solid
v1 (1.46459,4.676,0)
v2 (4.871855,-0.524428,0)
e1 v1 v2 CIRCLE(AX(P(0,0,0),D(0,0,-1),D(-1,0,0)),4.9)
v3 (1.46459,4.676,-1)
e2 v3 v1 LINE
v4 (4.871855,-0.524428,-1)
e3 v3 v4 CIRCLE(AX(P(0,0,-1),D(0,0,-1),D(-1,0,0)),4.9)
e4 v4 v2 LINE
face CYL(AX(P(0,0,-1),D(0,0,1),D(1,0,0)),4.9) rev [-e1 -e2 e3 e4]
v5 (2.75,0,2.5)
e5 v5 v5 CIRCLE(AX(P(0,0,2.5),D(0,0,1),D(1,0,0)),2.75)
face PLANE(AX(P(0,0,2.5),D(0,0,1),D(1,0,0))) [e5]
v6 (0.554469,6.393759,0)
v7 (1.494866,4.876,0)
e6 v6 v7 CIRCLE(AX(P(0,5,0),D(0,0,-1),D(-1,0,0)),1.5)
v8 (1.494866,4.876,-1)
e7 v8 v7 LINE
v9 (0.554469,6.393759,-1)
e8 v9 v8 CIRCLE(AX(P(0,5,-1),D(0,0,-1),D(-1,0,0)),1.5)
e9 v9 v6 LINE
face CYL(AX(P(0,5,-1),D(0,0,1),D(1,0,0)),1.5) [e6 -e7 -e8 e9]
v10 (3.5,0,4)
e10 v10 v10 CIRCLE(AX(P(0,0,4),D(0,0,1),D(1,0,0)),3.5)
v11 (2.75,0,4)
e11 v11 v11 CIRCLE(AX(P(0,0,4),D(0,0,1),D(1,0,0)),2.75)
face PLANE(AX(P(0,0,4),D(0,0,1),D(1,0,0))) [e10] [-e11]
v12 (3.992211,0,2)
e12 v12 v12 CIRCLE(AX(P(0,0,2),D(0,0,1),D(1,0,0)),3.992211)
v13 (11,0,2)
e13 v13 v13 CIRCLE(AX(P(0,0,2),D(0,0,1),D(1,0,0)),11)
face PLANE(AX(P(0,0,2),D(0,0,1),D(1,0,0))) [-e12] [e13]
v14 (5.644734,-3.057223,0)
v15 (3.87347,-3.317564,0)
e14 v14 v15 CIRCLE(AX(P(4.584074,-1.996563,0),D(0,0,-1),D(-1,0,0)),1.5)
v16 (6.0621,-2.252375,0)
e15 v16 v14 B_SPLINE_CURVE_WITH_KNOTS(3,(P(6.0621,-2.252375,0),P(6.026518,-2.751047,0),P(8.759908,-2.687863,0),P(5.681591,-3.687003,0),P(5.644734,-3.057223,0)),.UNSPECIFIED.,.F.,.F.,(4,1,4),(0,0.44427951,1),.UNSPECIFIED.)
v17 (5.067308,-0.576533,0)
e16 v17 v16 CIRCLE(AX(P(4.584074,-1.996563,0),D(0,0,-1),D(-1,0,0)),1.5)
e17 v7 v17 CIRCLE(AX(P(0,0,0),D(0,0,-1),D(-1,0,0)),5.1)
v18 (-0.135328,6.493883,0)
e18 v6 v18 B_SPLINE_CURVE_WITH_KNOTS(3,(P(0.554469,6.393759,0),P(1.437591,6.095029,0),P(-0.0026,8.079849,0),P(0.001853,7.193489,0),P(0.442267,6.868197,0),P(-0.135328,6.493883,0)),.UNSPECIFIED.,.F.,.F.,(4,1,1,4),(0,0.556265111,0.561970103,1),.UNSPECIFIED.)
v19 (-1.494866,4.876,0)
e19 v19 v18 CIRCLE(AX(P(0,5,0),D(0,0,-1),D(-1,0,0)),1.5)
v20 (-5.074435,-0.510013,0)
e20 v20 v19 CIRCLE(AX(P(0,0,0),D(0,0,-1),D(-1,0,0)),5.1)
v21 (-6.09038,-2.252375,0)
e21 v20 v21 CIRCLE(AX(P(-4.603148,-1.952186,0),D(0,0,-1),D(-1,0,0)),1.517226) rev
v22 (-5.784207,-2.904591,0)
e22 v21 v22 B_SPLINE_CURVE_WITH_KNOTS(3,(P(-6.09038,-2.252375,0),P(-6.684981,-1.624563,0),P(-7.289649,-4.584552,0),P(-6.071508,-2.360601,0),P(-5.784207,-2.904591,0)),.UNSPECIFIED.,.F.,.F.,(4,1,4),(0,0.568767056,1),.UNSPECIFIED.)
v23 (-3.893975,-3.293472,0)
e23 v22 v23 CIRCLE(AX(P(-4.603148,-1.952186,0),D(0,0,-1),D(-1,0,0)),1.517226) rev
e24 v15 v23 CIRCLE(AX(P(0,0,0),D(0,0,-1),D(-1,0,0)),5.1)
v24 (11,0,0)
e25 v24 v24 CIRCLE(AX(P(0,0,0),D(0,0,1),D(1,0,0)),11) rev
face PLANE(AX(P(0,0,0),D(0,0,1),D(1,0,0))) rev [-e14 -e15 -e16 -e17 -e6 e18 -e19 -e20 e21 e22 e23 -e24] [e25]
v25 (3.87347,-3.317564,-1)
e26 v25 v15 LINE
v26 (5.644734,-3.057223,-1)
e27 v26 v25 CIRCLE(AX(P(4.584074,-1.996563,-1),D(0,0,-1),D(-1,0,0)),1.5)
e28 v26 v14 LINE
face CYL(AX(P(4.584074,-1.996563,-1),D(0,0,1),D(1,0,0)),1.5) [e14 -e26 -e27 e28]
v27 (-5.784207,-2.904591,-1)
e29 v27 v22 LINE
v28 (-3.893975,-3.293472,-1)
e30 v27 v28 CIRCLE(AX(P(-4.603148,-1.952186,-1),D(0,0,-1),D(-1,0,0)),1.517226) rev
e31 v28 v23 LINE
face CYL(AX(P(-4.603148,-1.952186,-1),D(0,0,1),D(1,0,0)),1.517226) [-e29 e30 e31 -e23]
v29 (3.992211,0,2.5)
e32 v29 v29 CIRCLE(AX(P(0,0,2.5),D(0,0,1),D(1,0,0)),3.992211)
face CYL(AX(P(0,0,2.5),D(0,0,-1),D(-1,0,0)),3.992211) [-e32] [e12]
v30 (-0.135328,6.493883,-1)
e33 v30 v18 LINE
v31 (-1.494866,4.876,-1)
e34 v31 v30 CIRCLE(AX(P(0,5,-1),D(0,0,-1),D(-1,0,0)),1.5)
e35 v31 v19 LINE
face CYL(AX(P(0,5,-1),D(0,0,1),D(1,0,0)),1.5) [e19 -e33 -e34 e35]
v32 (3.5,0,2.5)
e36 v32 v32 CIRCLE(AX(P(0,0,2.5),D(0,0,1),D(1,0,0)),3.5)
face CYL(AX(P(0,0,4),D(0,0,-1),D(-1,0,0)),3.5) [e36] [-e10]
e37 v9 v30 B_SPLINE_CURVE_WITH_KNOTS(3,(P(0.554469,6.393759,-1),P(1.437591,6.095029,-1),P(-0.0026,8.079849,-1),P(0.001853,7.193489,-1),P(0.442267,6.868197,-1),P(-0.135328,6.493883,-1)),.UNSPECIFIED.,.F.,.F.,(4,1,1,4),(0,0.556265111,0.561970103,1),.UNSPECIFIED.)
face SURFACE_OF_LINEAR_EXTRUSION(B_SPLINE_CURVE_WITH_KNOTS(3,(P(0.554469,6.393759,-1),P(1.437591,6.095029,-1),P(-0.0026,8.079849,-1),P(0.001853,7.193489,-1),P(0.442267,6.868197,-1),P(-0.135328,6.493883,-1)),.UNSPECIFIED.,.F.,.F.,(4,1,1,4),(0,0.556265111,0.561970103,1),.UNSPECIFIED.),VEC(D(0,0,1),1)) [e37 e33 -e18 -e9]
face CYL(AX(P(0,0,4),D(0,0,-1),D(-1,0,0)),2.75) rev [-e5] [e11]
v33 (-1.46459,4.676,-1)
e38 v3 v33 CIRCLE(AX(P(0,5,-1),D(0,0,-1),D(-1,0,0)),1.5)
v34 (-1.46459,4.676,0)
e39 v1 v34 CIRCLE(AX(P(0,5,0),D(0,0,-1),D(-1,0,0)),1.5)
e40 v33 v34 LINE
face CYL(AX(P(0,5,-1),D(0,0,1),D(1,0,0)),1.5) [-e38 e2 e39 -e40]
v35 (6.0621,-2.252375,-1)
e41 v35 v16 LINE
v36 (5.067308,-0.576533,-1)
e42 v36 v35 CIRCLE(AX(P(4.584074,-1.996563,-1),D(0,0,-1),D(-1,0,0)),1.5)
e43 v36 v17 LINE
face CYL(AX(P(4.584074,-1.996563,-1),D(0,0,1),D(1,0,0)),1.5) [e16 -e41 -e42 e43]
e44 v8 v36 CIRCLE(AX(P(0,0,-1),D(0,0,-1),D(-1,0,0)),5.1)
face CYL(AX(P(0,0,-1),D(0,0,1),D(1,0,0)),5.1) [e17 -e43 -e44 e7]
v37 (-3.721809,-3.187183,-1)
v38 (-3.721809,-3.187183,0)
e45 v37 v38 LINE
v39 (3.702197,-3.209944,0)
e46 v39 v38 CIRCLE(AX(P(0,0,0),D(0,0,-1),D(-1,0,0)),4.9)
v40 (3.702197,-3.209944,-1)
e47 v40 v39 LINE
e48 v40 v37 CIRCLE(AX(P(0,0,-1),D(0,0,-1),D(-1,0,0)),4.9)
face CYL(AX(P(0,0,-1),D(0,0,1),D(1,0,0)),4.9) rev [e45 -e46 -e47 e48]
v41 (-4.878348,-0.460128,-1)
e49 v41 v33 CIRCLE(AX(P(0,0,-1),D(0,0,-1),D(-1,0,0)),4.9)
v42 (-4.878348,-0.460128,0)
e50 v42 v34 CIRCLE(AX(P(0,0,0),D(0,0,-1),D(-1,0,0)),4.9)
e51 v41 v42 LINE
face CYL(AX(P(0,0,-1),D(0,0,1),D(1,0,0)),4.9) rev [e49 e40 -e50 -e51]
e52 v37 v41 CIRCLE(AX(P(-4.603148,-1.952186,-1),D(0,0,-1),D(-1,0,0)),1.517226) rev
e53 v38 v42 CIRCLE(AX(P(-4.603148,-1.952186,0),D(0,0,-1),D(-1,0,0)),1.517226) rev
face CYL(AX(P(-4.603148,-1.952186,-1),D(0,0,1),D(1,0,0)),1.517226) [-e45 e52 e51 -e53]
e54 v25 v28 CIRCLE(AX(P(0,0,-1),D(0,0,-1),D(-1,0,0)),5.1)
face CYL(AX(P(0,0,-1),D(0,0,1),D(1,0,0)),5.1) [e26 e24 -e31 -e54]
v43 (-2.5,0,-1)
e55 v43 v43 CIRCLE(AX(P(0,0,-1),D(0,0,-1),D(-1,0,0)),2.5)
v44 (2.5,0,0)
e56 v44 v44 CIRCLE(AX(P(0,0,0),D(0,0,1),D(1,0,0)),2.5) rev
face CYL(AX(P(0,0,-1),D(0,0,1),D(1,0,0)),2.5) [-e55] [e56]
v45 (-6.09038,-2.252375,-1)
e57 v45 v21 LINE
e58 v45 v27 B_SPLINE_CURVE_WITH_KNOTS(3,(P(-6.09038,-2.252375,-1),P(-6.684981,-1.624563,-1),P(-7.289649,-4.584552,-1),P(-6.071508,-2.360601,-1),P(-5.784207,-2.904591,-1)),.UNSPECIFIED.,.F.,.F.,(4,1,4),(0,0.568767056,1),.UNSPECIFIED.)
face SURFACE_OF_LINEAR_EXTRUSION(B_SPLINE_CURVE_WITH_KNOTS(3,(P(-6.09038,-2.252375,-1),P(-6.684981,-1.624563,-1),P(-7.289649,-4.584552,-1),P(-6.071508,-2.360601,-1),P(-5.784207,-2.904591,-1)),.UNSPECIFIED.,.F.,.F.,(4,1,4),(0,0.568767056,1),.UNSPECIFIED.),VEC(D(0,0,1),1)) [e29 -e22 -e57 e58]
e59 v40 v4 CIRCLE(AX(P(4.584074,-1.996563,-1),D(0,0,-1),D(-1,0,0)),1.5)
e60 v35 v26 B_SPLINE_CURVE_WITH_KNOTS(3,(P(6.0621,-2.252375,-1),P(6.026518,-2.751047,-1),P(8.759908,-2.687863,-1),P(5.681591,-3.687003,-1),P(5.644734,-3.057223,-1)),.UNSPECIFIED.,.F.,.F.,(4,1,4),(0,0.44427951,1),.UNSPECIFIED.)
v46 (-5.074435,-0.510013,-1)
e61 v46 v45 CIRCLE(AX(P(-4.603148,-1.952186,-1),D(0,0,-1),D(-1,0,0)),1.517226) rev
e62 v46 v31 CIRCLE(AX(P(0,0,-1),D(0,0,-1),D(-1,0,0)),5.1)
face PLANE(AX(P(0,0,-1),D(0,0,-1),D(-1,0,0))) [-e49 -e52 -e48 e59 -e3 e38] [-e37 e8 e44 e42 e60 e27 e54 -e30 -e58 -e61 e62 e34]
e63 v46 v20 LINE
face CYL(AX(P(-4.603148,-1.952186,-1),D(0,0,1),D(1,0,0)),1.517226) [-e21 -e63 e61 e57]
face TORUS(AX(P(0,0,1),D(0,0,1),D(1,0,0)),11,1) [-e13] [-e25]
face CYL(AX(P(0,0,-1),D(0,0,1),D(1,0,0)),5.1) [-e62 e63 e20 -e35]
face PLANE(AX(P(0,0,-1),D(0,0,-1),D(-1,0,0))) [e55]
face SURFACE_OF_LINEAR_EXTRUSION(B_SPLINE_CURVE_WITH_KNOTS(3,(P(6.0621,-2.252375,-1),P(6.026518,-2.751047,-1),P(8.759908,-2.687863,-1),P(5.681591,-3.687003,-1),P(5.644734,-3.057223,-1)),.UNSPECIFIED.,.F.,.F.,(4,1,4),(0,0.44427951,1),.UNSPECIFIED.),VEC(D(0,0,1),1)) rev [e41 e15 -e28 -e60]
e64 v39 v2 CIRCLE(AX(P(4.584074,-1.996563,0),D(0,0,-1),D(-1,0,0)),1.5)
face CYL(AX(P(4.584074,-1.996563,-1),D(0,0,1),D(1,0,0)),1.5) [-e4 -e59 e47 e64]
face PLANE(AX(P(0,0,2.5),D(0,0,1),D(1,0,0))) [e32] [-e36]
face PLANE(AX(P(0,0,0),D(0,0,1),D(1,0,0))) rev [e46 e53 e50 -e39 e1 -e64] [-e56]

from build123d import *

# Parameters (mm, degrees)
SKETCH1_R           = 12
BOSS_EXTRUDE1_DEPTH = 2
SKETCH2_R           = 3.5
SKETCH2_R_2         = 2.75
BOSS_EXTRUDE2_DEPTH = 2
FILLET1_R           = 1
SKETCH3_R           = 2.5
BOSS_EXTRUDE3_DEPTH = 1
SKETCH4_R           = 3.992210858
BOSS_EXTRUDE4_DEPTH = 0.5


with BuildPart() as part:
    # Sketch1 → Boss-Extrude1 (new body)
    with BuildSketch(Plane.XY):
        Circle(SKETCH1_R)
    extrude(amount=BOSS_EXTRUDE1_DEPTH)

    # Sketch2 → Boss-Extrude2 (add)
    with BuildSketch(Plane.XY.offset(2)):
        Circle(SKETCH2_R)
        Circle(SKETCH2_R_2, mode=Mode.SUBTRACT)
    extrude(amount=BOSS_EXTRUDE2_DEPTH)

    # Fillet1
    fillet1_edges = [part.edges().sort_by_distance(p)[0] for p in [
        (-12, 0, 0),
        (-12, 0, 2),
    ]]
    fillet(fillet1_edges, radius=FILLET1_R - 0.0001)  # a hair under: the kernel refuses the full size

    # Sketch3 → Boss-Extrude3 (add)
    with BuildSketch(Plane(origin=(0, 0, 0), x_dir=(-1, 0, 0), z_dir=(0, 0, -1))):
        with Locations(Location((0, 0, 0), (0, 0, 180))):
            Circle(SKETCH3_R)
        with BuildLine():
            ThreePointArc((-5.067307925, -0.57653308), (-5.873937117, -1.230891086), (-6.062099925, -2.252375207))
            ThreePointArc((-6.062099925, -2.252375207), (-5.915680958, -2.687087026), (-5.644734338, -3.057223228))
            ThreePointArc((-5.644734338, -3.057223228), (-4.802200561, -3.480618607), (-3.873470329, -3.317563506))
            ThreePointArc((-3.873470329, -3.317563506), (-4.675755649, -2.036494318), (-5.067307925, -0.57653308))
        make_face()
        with BuildLine():
            ThreePointArc((-5.644734338, -3.057223228), (-5.915680958, -2.687087026), (-6.062099925, -2.252375207))
            add(Edge.make_bspline(
                [(-6.062099925, -2.252375207), (-6.026517589, -2.751047072), (-8.759907871, -2.687863498), (-5.681591245, -3.687002551), (-5.644734338, -3.057223228)],
                knots=[0, 0, 0, 0, 0.44427951, 1, 1, 1, 1], degree=3))
        make_face()
        with BuildLine():
            ThreePointArc((-1.49486588, 4.876), (-4.265918484, 2.794984703), (-5.067307925, -0.57653308))
            ThreePointArc((-5.067307925, -0.57653308), (-4.970460995, -0.547182079), (-4.871855436, -0.524427893))
            ThreePointArc((-4.871855436, -0.524427893), (-4.098627563, 2.68537746), (-1.464590045, 4.676))
            ThreePointArc((-1.464590045, 4.676), (-1.483103113, 4.775489073), (-1.49486588, 4.876))
        make_face()
        with BuildLine():
            ThreePointArc((-4.871855436, -0.524427893), (-4.970460995, -0.547182079), (-5.067307925, -0.57653308))
            ThreePointArc((-5.067307925, -0.57653308), (-4.675755649, -2.036494318), (-3.873470329, -3.317563506))
            ThreePointArc((-3.873470329, -3.317563506), (-3.786017441, -3.266643945), (-3.702196885, -3.209943649))
            ThreePointArc((-3.702196885, -3.209943649), (-4.492392683, -1.956631796), (-4.871855436, -0.524427893))
        make_face()
        with BuildLine():
            ThreePointArc((-3.702196885, -3.209943649), (-3.786017441, -3.266643945), (-3.873470329, -3.317563506))
            ThreePointArc((-3.873470329, -3.317563506), (0.01581793, -5.09997547), (3.893974917, -3.293472232))
            ThreePointArc((3.893974917, -3.293472232), (3.806118362, -3.243200717), (3.721809355, -3.187182945))
            ThreePointArc((3.721809355, -3.187182945), (0.015022472, -4.899976972), (-3.702196885, -3.209943649))
        make_face()
        with BuildLine():
            ThreePointArc((-3.084074166, -1.996563057), (-3.630573223, -0.838618346), (-4.871855436, -0.524427893))
            ThreePointArc((-4.871855436, -0.524427893), (-4.492392683, -1.956631796), (-3.702196885, -3.209943649))
            ThreePointArc((-3.702196885, -3.209943649), (-3.247508432, -2.677438992), (-3.084074166, -1.996563057))
        make_face()
        with BuildLine():
            ThreePointArc((1.49486588, 4.876), (0, 5.1), (-1.49486588, 4.876))
            ThreePointArc((-1.49486588, 4.876), (-1.483103113, 4.775489073), (-1.464590045, 4.676))
            ThreePointArc((-1.464590045, 4.676), (0, 4.9), (1.464590045, 4.676))
            ThreePointArc((1.464590045, 4.676), (1.483103113, 4.775489073), (1.49486588, 4.876))
        make_face()
        with BuildLine():
            ThreePointArc((-0.554469126, 6.393758942), (-1.275084916, 5.790036997), (-1.49486588, 4.876))
            ThreePointArc((-1.49486588, 4.876), (0, 5.1), (1.49486588, 4.876))
            ThreePointArc((1.49486588, 4.876), (1.49871592, 4.937946879), (1.5, 5))
            ThreePointArc((1.5, 5), (1.10747264, 6.011683919), (0.135327531, 6.493883014))
            ThreePointArc((0.135327531, 6.493883014), (-0.215467229, 6.484443961), (-0.554469126, 6.393758942))
        make_face()
        with BuildLine():
            ThreePointArc((5.074434577, -0.510013455), (4.695210635, -1.991230046), (3.893974917, -3.293472232))
            ThreePointArc((3.893974917, -3.293472232), (4.908886749, -3.438287773), (5.784206585, -2.904590527))
            add(Edge.make_bspline(
                [(5.865406446, -2.794015708), (5.836751545, -2.820305024), (5.809552866, -2.856598637), (5.784206585, -2.904590527)],
                knots=[0.961955758, 0.961955758, 0.961955758, 0.961955758, 1, 1, 1, 1], degree=3))
            ThreePointArc((5.865406446, -2.794015708), (6.004314758, -2.534169766), (6.090380192, -2.252375207))
            ThreePointArc((6.090380192, -2.252375207), (6.112856484, -2.103028092), (6.120373409, -1.952186319))
            ThreePointArc((6.120373409, -1.952186319), (5.831362343, -1.061421113), (5.074434577, -0.510013455))
        make_face()
        with BuildLine():
            ThreePointArc((3.721809355, -3.187182945), (3.806118362, -3.243200717), (3.893974917, -3.293472232))
            ThreePointArc((3.893974917, -3.293472232), (4.695210635, -1.991230046), (5.074434577, -0.510013455))
            ThreePointArc((5.074434577, -0.510013455), (4.97722395, -0.481798325), (4.878348324, -0.460127837))
            ThreePointArc((4.878348324, -0.460127837), (4.511084728, -1.913142593), (3.721809355, -3.187182945))
        make_face()
        with BuildLine():
            ThreePointArc((1.464590045, 4.676), (0, 4.9), (-1.464590045, 4.676))
            ThreePointArc((-1.464590045, 4.676), (0, 3.5), (1.464590045, 4.676))
        make_face()
        with BuildLine():
            add(Edge.make_bspline(
                [(-0.554469126, 6.393758942), (-1.437590662, 6.09502869), (0.002600213, 8.079848895), (-0.001852582, 7.193488902), (-0.442267062, 6.868197163), (0.135327531, 6.493883014)],
                knots=[0, 0, 0, 0, 0.556265111, 0.561970103, 1, 1, 1, 1], degree=3))
            ThreePointArc((-0.554469126, 6.393758942), (-0.215467229, 6.484443961), (0.135327531, 6.493883014))
        make_face()
        with BuildLine():
            ThreePointArc((5.1, 0), (4.100842352, 3.032011215), (1.49486588, 4.876))
            ThreePointArc((1.49486588, 4.876), (1.483103113, 4.775489073), (1.464590045, 4.676))
            ThreePointArc((1.464590045, 4.676), (3.948828385, 2.901164316), (4.9, 0))
            ThreePointArc((4.9, 0), (4.894584088, -0.230318487), (4.878348324, -0.460127837))
            ThreePointArc((4.878348324, -0.460127837), (4.97722395, -0.481798325), (5.074434577, -0.510013455))
            ThreePointArc((5.074434577, -0.510013455), (5.093604634, -0.255326906), (5.1, 0))
        make_face()
        with BuildLine():
            ThreePointArc((4.878348324, -0.460127837), (3.206344863, -1.359804857), (3.721809355, -3.187182945))
            ThreePointArc((3.721809355, -3.187182945), (4.511084728, -1.913142593), (4.878348324, -0.460127837))
        make_face()
        with BuildLine():
            ThreePointArc((6.090380192, -2.252375207), (6.004314758, -2.534169766), (5.865406446, -2.794015708))
            add(Edge.make_bspline(
                [(6.090380192, -2.252375207), (6.684980611, -1.62456302), (7.266645295, -4.471941038), (6.161555953, -2.52231461), (5.865406446, -2.794015708)],
                knots=[0, 0, 0, 0, 0.568767056, 0.961955758, 0.961955758, 0.961955758, 0.961955758], degree=3))
        make_face()
    extrude(amount=BOSS_EXTRUDE3_DEPTH)

    # Sketch4 → Boss-Extrude4 (add)
    with BuildSketch(Plane.XY.offset(2)):
        Circle(SKETCH4_R)
    extrude(amount=BOSS_EXTRUDE4_DEPTH)


solid = part.part
